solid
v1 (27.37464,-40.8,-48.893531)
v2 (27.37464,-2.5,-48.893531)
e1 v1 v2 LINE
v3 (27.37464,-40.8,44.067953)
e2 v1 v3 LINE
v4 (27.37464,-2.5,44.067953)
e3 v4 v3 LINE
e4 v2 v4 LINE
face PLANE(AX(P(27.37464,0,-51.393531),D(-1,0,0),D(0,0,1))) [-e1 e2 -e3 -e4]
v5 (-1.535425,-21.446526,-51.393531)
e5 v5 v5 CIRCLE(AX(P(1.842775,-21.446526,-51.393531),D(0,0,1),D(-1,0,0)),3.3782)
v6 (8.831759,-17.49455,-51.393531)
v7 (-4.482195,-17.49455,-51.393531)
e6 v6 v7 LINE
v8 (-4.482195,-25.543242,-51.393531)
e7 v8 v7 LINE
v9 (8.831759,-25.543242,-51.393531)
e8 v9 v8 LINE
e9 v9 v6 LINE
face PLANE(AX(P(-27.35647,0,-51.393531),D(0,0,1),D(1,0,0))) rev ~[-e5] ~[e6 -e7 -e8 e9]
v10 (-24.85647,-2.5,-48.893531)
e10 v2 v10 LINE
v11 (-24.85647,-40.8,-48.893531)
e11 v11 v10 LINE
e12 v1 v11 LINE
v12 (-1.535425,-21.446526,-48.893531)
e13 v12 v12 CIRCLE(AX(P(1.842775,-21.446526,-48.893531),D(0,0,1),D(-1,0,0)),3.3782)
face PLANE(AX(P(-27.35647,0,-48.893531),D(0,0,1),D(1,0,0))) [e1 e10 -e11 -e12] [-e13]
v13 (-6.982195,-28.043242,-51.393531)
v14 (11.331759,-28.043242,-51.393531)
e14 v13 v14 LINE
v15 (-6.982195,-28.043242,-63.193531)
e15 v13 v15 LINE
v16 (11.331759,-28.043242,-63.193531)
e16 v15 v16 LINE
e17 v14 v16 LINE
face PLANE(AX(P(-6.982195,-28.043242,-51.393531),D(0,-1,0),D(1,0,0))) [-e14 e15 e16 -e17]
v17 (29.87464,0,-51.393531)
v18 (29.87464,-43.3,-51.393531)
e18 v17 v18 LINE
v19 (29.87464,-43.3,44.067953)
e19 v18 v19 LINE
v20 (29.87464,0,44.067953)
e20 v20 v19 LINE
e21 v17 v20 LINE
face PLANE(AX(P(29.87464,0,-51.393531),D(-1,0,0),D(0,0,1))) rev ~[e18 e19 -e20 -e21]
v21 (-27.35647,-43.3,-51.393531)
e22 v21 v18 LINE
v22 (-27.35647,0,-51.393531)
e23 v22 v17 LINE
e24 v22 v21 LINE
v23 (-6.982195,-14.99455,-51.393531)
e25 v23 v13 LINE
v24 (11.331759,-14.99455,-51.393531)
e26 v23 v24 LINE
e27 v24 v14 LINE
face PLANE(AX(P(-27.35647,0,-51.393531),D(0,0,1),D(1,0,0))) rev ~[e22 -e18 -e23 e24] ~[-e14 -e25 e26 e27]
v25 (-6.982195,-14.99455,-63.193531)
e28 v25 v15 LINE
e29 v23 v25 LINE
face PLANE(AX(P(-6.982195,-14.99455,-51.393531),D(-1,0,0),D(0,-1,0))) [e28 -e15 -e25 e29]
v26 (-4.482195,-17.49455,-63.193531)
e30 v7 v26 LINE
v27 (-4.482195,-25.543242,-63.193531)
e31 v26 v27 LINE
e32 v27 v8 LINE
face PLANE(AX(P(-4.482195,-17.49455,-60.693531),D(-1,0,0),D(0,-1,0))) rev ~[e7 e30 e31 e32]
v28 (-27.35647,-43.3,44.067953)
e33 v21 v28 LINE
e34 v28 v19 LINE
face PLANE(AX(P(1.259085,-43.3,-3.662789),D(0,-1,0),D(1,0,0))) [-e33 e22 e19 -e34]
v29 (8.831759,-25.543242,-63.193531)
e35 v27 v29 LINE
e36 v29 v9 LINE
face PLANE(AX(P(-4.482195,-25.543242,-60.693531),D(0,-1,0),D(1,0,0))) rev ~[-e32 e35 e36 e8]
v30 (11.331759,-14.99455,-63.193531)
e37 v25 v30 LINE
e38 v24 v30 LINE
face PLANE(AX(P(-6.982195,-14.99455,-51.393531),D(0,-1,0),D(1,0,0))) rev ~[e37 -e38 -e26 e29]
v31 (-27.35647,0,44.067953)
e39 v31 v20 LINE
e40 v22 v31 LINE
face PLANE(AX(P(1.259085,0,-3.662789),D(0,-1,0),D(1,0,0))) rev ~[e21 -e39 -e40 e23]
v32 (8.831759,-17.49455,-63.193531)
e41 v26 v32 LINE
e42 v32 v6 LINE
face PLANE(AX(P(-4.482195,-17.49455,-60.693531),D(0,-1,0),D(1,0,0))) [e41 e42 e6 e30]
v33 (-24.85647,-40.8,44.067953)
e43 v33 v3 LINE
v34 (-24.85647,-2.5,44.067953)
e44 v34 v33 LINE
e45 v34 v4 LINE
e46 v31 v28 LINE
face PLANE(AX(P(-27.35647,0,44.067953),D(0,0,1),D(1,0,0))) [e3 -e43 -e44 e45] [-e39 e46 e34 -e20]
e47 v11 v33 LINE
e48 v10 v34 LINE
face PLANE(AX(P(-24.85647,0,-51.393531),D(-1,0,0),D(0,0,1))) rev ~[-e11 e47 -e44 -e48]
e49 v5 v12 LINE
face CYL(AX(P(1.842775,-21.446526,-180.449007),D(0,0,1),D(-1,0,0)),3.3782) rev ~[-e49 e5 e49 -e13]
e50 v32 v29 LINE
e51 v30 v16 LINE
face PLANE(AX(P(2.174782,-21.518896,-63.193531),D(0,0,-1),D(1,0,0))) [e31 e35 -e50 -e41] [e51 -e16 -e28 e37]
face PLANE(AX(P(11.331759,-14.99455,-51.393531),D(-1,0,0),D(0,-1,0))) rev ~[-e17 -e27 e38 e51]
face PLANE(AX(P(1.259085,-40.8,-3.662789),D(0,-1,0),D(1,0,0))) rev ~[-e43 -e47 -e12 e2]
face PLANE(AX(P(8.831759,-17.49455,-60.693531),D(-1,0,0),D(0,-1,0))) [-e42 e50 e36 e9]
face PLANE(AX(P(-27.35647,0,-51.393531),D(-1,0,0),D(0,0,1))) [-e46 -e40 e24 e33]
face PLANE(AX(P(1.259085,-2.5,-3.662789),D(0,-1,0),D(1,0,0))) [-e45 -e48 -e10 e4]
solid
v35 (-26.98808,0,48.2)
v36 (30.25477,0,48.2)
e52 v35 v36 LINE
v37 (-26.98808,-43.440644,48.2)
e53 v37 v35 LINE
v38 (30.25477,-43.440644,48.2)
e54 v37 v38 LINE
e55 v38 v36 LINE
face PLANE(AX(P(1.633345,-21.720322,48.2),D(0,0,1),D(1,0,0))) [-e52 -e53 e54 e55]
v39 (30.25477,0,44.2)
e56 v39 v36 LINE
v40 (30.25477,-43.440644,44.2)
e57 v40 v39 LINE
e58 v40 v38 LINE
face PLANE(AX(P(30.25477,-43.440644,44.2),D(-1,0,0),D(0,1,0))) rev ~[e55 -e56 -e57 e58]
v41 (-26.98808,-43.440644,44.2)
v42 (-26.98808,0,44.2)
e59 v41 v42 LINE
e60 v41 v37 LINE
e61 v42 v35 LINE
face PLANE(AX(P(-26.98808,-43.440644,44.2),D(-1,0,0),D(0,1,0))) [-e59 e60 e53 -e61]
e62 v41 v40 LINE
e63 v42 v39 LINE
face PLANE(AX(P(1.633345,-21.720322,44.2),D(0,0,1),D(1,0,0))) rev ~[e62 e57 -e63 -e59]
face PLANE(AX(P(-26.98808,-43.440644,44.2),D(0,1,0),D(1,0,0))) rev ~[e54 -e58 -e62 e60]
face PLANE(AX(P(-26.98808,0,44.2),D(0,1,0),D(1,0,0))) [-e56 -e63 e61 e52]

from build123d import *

# Parameters (mm, degrees)
F0_W      = 57.2311095893
F0_H      = 95.4614840448
F1_DEPTH  = 43.3
F2_T      = -2.5
F3_W      = 18.3139545843
F3_H      = 13.0486916751
F4_DEPTH  = 11.8
F5_T      = -2.5
F7_D      = 6.7564
F9_W      = 57.2428498417
F9_H      = 43.440643698
F10_DEPTH = 4


# Not quite as in the source:
# - a shell that OpenCascade refuses in one call is made with other operations: the cavity is built on its own and cut out


with BuildPart() as f1:
    # F0 (on Front) → F1 (new body)
    with BuildSketch(Plane.XZ):
        with Locations((1.2590847909, -3.6627892405)):
            Rectangle(F0_W, F0_H)
    extrude(amount=F1_DEPTH)

    # F2
    f2_openings = [f1.faces().sort_by_distance(p)[0] for p in [
        (1.259085, -21.65, 44.067953),
    ]]
    offset(amount=F2_T, openings=f2_openings)

    # F3 (on face) → F4 (join)
    with BuildSketch(Plane(origin=(0, 0, -51.3935312629), x_dir=(1, 0, 0), z_dir=(0, 0, -1))):
        with Locations((2.1747821011, 21.5188963339)):
            Rectangle(F3_W, F3_H)
    extrude(amount=F4_DEPTH)

    # F5: a shell. OpenCascade refuses it in one call, so the cavity is built on its own and cut out:
    # the body offset inwards by the wall thickness, plus a prism from it out through each open face.
    f5_core = offset(f1.part, amount=F5_T, kind=Kind.INTERSECTION, mode=Mode.PRIVATE)
    f5_exits = [f5_core.faces().sort_by_distance(p)[0] for p in [
        (2.174782, -21.518896, -60.693531),
    ]]
    add(f5_core, mode=Mode.SUBTRACT)
    extrude(f5_exits, amount=-F5_T, mode=Mode.SUBTRACT)

    # F7 (through all)
    with Locations(Plane(origin=(0, 0, -51.3935312629), x_dir=(1, 0, 0), z_dir=(0, 0, -1))):
        with Locations((1.8427748, 21.4465260506)):
            Hole(F7_D / 2)


with BuildPart() as f10:
    # F9 (on offset) → F10 (new body)
    with BuildSketch(Plane.XY.offset(44.2)):
        with Locations((1.6333451495, -21.720321849)):
            Rectangle(F9_W, F9_H)
    extrude(amount=F10_DEPTH)


solid = Compound([f1.part, f10.part])
